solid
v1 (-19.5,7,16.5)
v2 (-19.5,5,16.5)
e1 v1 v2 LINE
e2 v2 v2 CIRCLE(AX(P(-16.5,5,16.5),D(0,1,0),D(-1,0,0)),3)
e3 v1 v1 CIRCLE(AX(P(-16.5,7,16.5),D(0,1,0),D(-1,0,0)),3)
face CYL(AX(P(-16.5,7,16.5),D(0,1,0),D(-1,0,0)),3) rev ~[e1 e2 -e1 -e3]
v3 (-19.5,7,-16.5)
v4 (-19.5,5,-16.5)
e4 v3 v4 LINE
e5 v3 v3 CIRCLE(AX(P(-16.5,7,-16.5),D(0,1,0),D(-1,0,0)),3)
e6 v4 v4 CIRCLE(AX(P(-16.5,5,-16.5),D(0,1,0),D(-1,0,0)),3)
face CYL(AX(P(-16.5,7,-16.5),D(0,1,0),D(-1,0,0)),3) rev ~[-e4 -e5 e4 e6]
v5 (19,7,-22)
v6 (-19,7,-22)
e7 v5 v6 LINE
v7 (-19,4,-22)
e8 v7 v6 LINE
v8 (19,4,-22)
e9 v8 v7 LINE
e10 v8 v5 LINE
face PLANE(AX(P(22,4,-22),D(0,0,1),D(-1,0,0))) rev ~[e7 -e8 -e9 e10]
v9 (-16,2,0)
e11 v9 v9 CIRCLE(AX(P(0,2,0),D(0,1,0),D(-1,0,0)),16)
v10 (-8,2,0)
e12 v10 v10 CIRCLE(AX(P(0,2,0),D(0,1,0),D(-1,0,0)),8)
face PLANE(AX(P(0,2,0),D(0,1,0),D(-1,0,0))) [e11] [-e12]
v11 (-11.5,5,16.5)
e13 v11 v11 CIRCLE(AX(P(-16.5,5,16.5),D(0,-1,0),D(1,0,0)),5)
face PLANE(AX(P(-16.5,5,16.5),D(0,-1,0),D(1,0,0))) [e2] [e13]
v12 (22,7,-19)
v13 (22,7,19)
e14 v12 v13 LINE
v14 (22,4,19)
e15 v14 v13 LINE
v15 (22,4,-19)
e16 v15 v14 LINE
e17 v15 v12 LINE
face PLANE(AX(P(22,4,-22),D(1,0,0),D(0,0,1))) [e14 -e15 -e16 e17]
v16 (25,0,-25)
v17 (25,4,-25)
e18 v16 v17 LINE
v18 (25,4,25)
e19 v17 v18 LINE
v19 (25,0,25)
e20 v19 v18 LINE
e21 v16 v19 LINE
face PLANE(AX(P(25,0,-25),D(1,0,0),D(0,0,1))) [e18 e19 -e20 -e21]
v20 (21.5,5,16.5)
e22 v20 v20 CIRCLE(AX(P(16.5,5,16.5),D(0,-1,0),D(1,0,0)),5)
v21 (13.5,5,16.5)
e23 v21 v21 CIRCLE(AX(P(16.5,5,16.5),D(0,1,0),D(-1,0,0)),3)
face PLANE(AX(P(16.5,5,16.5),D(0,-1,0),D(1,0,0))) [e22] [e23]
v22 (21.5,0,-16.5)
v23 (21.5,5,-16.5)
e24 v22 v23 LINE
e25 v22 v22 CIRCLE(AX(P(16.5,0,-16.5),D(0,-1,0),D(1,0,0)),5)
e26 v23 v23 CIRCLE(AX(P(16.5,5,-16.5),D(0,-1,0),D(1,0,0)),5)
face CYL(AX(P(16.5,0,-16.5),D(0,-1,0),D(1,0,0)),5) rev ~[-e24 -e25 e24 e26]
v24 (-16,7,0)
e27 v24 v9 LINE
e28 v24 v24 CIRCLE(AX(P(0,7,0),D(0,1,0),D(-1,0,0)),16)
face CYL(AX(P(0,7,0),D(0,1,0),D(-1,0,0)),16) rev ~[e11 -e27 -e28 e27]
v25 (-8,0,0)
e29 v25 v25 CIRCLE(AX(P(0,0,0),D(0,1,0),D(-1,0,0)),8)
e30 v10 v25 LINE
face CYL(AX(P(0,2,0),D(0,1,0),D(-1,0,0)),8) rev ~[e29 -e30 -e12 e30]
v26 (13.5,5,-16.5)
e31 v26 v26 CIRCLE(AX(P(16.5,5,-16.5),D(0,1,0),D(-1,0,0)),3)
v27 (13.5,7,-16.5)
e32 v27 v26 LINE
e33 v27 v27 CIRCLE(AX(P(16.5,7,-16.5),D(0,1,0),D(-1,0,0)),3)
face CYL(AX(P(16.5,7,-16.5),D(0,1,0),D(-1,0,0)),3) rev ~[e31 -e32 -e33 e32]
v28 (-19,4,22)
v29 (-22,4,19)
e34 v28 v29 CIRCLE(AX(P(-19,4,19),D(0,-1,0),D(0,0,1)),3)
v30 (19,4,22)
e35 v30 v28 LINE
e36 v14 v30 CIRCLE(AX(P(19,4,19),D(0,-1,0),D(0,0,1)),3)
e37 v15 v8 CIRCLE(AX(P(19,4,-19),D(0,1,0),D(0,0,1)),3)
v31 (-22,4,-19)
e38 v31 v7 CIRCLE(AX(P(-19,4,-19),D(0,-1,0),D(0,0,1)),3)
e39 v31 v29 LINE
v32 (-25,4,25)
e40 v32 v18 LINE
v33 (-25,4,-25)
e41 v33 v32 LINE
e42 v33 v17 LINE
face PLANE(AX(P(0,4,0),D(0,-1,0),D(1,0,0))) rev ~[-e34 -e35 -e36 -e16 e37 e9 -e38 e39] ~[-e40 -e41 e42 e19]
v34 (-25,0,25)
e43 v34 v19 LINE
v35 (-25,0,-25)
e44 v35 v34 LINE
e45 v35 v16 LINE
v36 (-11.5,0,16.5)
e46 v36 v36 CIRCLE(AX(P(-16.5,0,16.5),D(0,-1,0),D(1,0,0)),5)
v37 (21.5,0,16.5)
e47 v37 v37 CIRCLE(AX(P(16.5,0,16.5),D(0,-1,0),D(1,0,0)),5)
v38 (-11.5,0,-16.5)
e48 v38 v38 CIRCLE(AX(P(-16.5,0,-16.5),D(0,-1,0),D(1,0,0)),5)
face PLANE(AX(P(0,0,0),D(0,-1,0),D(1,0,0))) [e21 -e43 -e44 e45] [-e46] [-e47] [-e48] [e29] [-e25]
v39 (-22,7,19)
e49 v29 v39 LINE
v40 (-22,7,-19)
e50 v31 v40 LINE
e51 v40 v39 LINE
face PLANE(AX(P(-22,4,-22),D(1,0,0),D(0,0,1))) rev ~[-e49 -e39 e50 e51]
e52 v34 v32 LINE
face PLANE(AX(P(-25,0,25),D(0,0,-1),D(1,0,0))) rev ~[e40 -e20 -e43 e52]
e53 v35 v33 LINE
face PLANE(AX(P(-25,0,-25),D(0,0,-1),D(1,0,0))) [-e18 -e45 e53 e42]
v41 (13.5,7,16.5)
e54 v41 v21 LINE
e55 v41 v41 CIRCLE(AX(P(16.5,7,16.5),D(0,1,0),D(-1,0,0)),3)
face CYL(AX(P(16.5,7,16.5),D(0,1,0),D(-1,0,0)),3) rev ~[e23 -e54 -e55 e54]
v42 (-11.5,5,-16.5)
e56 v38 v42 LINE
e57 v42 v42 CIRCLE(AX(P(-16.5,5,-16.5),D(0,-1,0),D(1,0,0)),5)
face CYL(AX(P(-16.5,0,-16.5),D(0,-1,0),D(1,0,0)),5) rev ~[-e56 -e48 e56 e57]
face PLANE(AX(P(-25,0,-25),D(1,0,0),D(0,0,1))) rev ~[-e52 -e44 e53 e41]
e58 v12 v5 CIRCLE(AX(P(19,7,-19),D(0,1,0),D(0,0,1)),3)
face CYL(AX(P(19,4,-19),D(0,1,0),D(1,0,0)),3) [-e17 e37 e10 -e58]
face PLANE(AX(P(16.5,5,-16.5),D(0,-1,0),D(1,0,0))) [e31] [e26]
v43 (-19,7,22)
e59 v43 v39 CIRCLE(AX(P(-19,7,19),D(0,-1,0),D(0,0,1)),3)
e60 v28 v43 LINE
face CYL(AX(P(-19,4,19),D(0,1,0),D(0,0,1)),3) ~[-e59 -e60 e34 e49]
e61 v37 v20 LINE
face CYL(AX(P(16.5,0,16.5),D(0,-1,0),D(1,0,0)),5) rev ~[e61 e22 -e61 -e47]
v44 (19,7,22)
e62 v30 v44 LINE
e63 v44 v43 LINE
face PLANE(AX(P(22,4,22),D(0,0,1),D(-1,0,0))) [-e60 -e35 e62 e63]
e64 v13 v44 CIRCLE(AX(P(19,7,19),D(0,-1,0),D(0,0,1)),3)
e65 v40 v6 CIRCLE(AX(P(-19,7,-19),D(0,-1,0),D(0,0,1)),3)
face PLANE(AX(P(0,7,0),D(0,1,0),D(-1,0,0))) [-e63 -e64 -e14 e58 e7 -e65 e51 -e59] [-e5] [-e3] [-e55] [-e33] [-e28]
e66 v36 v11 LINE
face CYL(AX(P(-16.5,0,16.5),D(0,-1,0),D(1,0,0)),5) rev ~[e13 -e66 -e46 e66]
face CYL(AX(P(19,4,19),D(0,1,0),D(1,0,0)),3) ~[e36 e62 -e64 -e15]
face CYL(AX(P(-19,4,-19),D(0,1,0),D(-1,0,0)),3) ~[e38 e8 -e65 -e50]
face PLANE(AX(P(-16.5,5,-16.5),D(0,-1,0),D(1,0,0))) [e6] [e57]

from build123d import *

# Parameters (mm, degrees)
F0_W      = 50
F0_H      = 50
F1_DEPTH  = 4
F2_W      = 44
F2_H      = 44
F3_DEPTH  = 3
F4_R      = 3
F5_DEPTH  = 25
F6_R      = 5
F6_R_2    = 3
F7_DEPTH  = 5
F8_R      = 16
F9_DEPTH  = 5
F10_R     = 8
F11_DEPTH = 25
F12_R     = 3


# Not quite as in the source:
# - a feature names something its author has since deleted; it is built from what else it names


with BuildPart() as f1:
    # F0 (on Front) → F1 (new body)
    with BuildSketch(Plane.XZ):
        Rectangle(F0_W, F0_H)
    extrude(amount=-F1_DEPTH)

    # F2 (on face) → F3 (join)
    with BuildSketch(Plane(origin=(0, 4, 0), x_dir=(-1, 0, 0), z_dir=(0, 1, 0))):
        Rectangle(F2_W, F2_H)
    extrude(amount=F3_DEPTH)

    # F4 (on face) → F5 (cut)
    with BuildSketch(Plane(origin=(0, 7, 0), x_dir=(-1, 0, 0), z_dir=(0, 1, 0))):
        with Locations((-16.5, 16.5)):
            Circle(F4_R)
        with Locations((16.5, 16.5)):
            Circle(F4_R)
        with Locations((16.5, -16.5)):
            Circle(F4_R)
        with Locations((-16.5, -16.5)):
            Circle(F4_R)
    extrude(amount=-F5_DEPTH, mode=Mode.SUBTRACT)

    # F6 (on face) → F7 (cut)
    with BuildSketch(Plane.XZ):
        with Locations((-16.5, 16.5)):
            Circle(F6_R)
        with Locations((-16.5, 16.5)):
            Circle(F6_R_2, mode=Mode.SUBTRACT)
        with Locations((16.5, 16.5)):
            Circle(F6_R)
        with Locations((16.5, 16.5)):
            Circle(F6_R_2, mode=Mode.SUBTRACT)
        with Locations((16.5, -16.5)):
            Circle(F6_R)
        with Locations((16.5, -16.5)):
            Circle(F6_R_2, mode=Mode.SUBTRACT)
        with Locations((-16.5, -16.5)):
            Circle(F6_R)
        with Locations((-16.5, -16.5)):
            Circle(F6_R_2, mode=Mode.SUBTRACT)
    extrude(amount=-F7_DEPTH, mode=Mode.SUBTRACT)

    # F8 (on face) → F9 (cut)
    with BuildSketch(Plane(origin=(0, 7, 0), x_dir=(-1, 0, 0), z_dir=(0, 1, 0))):
        Circle(F8_R)
    extrude(amount=-F9_DEPTH, mode=Mode.SUBTRACT)

    # F10 (on face) → F11 (cut)
    with BuildSketch(Plane(origin=(0, 2, 0), x_dir=(-1, 0, 0), z_dir=(0, 1, 0))):
        Circle(F10_R)
    extrude(amount=-F11_DEPTH, mode=Mode.SUBTRACT)

    # F12
    f12_edges = [f1.edges().sort_by_distance(p)[0] for p in [
        (-22, 5.5, 22),
        (-22, 5.5, -22),
        (22, 5.5, -22),
        (22, 5.5, 22),
    ]]
    fillet(f12_edges, radius=F12_R)


solid = f1.part
